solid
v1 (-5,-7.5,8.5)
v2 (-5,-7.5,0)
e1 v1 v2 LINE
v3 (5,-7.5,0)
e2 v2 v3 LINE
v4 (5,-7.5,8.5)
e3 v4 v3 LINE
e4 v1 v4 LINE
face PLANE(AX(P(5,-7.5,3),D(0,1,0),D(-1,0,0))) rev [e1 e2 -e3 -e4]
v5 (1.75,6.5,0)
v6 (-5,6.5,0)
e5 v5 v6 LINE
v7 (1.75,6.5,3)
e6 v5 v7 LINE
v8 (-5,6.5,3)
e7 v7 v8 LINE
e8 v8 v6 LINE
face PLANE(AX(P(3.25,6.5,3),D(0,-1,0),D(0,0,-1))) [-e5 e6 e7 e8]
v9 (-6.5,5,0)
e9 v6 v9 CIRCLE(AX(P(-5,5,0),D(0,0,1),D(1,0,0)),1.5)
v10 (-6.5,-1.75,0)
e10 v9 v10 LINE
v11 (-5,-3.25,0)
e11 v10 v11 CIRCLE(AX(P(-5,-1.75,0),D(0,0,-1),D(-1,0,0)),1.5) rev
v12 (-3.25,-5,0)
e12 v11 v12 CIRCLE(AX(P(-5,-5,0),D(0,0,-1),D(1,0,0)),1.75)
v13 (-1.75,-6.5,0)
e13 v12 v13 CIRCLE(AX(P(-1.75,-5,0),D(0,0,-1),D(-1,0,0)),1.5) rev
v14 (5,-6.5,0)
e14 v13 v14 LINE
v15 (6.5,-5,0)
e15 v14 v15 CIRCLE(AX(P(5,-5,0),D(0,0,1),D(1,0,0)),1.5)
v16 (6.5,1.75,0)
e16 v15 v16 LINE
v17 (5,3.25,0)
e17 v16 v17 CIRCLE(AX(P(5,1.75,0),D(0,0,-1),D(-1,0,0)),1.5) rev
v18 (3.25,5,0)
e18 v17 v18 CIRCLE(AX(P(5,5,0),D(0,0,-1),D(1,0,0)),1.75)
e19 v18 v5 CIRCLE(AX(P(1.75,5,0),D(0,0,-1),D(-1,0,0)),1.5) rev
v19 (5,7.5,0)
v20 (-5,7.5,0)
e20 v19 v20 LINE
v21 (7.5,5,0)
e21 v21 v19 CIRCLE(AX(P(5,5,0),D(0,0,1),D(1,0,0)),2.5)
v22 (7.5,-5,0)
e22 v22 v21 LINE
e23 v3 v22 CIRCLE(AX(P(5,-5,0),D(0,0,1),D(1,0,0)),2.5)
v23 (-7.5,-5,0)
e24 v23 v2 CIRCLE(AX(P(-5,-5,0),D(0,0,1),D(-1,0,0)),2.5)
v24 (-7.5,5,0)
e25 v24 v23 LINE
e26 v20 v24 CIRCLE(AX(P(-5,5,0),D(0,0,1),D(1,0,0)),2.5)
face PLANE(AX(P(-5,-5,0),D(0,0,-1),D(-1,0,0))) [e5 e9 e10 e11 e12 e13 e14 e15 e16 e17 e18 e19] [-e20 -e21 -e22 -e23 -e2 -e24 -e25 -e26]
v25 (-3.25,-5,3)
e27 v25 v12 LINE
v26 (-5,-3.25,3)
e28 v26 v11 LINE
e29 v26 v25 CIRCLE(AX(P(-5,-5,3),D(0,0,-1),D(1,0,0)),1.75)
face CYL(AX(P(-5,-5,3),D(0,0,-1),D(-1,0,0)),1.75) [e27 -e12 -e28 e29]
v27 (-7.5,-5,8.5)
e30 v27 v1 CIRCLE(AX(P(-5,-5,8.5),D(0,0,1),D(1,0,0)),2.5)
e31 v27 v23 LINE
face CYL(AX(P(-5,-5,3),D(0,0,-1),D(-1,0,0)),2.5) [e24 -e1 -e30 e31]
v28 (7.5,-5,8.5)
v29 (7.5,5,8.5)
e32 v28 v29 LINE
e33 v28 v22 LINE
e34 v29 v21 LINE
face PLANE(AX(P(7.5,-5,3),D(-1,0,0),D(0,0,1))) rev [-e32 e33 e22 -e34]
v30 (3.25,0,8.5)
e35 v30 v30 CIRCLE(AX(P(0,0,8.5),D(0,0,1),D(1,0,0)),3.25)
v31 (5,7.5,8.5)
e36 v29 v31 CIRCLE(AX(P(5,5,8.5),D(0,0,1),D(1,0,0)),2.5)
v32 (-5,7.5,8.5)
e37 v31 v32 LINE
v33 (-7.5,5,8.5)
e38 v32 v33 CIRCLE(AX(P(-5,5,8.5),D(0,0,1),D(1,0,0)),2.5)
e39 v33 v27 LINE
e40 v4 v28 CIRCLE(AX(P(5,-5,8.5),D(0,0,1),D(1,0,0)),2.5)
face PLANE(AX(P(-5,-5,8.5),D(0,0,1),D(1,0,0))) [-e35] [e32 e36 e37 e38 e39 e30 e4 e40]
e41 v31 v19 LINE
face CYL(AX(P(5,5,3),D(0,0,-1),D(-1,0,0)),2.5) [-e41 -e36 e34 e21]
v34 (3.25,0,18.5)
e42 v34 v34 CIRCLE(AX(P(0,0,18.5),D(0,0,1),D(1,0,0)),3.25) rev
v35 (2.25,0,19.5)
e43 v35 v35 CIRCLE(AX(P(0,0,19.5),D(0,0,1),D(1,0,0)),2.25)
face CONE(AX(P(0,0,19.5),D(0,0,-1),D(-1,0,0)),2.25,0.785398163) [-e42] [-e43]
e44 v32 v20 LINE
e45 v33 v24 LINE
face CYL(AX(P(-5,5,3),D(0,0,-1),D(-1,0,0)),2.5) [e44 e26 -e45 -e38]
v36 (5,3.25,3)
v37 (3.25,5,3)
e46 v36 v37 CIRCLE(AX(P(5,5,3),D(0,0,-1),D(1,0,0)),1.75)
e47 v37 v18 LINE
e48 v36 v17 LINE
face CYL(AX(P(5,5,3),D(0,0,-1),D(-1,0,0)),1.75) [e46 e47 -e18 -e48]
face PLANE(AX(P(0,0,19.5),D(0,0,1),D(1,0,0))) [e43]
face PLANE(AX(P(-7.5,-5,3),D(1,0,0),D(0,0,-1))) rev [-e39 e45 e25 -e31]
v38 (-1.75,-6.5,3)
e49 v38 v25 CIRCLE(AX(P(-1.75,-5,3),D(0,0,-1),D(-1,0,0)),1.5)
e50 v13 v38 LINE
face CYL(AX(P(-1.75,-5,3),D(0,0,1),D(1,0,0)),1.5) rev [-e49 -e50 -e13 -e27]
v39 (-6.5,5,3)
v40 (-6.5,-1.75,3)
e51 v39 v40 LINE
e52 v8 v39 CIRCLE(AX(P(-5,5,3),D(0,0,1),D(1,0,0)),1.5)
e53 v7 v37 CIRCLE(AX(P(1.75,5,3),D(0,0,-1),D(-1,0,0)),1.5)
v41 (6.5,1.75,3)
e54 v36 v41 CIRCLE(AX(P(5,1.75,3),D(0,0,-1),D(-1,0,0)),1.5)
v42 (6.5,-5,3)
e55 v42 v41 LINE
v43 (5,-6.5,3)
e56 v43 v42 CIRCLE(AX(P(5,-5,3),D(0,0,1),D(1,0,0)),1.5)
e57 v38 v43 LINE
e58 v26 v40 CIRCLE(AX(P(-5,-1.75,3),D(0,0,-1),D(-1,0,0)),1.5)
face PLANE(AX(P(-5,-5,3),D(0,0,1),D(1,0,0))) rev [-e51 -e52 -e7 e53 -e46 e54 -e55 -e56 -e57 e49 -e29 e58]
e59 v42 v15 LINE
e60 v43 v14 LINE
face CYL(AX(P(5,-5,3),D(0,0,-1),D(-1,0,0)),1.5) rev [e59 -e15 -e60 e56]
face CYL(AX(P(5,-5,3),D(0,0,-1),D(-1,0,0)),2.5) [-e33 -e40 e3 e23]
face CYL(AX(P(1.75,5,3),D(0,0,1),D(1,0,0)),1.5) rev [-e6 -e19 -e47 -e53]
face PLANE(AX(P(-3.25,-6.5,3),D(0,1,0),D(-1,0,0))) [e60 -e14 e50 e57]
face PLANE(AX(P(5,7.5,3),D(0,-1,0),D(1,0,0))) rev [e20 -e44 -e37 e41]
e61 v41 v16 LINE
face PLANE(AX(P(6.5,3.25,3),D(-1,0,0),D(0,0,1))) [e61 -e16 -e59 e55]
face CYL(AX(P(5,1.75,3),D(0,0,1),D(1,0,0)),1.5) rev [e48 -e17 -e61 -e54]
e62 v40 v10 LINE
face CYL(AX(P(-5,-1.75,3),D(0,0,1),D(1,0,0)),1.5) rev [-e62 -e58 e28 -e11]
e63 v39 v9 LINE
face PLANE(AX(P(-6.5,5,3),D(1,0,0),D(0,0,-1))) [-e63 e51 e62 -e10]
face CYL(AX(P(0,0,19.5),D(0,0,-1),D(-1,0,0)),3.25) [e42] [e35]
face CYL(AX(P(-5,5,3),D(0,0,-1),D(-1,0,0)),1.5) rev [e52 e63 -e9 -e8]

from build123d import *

# Parameters (mm, degrees)
BOSS_EXTRUDE1_DEPTH = 3
FILLET1_R           = 1.5
BOSS_EXTRUDE2_DEPTH = 5.5
SKETCH4_R           = 3.25
BOSS_EXTRUDE3_DEPTH = 11
CHAMFER1_SIZE       = 1


with BuildPart() as part:
    # Sketch1 → Boss-Extrude1 (new body)
    with BuildSketch(Plane.XY):
        with BuildLine():
            Line((5, -7.5), (-5, -7.5))
            ThreePointArc((-5, -7.5), (-6.767766953, -6.767766953), (-7.5, -5))
            Line((-7.5, -5), (-7.5, 5))
            ThreePointArc((-7.5, 5), (-6.767766953, 6.767766953), (-5, 7.5))
            Line((-5, 7.5), (5, 7.5))
            ThreePointArc((5, 7.5), (6.767766953, 6.767766953), (7.5, 5))
            Line((7.5, 5), (7.5, -5))
            ThreePointArc((7.5, -5), (6.767766953, -6.767766953), (5, -7.5))
        make_face()
        with BuildLine():
            Line((3.25, 5), (3.25, 6.5))
            Line((3.25, 6.5), (-5, 6.5))
            ThreePointArc((-5, 6.5), (-6.060660172, 6.060660172), (-6.5, 5))
            Line((-6.5, 5), (-6.5, -3.25))
            Line((-6.5, -3.25), (-5, -3.25))
            ThreePointArc((-5, -3.25), (-3.762563133, -3.762563133), (-3.25, -5))
            Line((-3.25, -5), (-3.25, -6.5))
            Line((-3.25, -6.5), (5, -6.5))
            ThreePointArc((5, -6.5), (6.060660172, -6.060660172), (6.5, -5))
            Line((6.5, -5), (6.5, 3.25))
            Line((6.5, 3.25), (5, 3.25))
            ThreePointArc((5, 3.25), (3.762563133, 3.762563133), (3.25, 5))
        make_face(mode=Mode.SUBTRACT)
    extrude(amount=BOSS_EXTRUDE1_DEPTH)

    # Fillet1
    fillet1_edges = [part.edges().sort_by_distance(p)[0] for p in [
        (-6.5, -3.25, 1.5),
        (-3.25, -6.5, 1.5),
        (6.5, 3.25, 1.5),
        (3.25, 6.5, 1.5),
    ]]
    fillet(fillet1_edges, radius=FILLET1_R - 0.0001)  # a hair under: the kernel refuses the full size

    # Sketch3 → Boss-Extrude2 (add)
    with BuildSketch(Plane.XY.offset(3)):
        with BuildLine():
            Line((-5, -7.5), (5, -7.5))
            ThreePointArc((5, -7.5), (6.767766953, -6.767766953), (7.5, -5))
            Line((7.5, -5), (7.5, 5))
            ThreePointArc((7.5, 5), (6.767766953, 6.767766953), (5, 7.5))
            Line((5, 7.5), (-5, 7.5))
            ThreePointArc((-5, 7.5), (-6.767766953, 6.767766953), (-7.5, 5))
            Line((-7.5, 5), (-7.5, -5))
            ThreePointArc((-7.5, -5), (-6.767766953, -6.767766953), (-5, -7.5))
        make_face()
    extrude(amount=BOSS_EXTRUDE2_DEPTH)

    # Sketch4 → Boss-Extrude3 (add)
    with BuildSketch(Plane.XY.offset(8.5)):
        Circle(SKETCH4_R)
    extrude(amount=BOSS_EXTRUDE3_DEPTH)

    # Chamfer1
    chamfer1_edges = [part.edges().sort_by_distance(p)[0] for p in [
        (-3.25, 0, 19.5),
    ]]
    chamfer(chamfer1_edges, length=CHAMFER1_SIZE)


solid = part.part
